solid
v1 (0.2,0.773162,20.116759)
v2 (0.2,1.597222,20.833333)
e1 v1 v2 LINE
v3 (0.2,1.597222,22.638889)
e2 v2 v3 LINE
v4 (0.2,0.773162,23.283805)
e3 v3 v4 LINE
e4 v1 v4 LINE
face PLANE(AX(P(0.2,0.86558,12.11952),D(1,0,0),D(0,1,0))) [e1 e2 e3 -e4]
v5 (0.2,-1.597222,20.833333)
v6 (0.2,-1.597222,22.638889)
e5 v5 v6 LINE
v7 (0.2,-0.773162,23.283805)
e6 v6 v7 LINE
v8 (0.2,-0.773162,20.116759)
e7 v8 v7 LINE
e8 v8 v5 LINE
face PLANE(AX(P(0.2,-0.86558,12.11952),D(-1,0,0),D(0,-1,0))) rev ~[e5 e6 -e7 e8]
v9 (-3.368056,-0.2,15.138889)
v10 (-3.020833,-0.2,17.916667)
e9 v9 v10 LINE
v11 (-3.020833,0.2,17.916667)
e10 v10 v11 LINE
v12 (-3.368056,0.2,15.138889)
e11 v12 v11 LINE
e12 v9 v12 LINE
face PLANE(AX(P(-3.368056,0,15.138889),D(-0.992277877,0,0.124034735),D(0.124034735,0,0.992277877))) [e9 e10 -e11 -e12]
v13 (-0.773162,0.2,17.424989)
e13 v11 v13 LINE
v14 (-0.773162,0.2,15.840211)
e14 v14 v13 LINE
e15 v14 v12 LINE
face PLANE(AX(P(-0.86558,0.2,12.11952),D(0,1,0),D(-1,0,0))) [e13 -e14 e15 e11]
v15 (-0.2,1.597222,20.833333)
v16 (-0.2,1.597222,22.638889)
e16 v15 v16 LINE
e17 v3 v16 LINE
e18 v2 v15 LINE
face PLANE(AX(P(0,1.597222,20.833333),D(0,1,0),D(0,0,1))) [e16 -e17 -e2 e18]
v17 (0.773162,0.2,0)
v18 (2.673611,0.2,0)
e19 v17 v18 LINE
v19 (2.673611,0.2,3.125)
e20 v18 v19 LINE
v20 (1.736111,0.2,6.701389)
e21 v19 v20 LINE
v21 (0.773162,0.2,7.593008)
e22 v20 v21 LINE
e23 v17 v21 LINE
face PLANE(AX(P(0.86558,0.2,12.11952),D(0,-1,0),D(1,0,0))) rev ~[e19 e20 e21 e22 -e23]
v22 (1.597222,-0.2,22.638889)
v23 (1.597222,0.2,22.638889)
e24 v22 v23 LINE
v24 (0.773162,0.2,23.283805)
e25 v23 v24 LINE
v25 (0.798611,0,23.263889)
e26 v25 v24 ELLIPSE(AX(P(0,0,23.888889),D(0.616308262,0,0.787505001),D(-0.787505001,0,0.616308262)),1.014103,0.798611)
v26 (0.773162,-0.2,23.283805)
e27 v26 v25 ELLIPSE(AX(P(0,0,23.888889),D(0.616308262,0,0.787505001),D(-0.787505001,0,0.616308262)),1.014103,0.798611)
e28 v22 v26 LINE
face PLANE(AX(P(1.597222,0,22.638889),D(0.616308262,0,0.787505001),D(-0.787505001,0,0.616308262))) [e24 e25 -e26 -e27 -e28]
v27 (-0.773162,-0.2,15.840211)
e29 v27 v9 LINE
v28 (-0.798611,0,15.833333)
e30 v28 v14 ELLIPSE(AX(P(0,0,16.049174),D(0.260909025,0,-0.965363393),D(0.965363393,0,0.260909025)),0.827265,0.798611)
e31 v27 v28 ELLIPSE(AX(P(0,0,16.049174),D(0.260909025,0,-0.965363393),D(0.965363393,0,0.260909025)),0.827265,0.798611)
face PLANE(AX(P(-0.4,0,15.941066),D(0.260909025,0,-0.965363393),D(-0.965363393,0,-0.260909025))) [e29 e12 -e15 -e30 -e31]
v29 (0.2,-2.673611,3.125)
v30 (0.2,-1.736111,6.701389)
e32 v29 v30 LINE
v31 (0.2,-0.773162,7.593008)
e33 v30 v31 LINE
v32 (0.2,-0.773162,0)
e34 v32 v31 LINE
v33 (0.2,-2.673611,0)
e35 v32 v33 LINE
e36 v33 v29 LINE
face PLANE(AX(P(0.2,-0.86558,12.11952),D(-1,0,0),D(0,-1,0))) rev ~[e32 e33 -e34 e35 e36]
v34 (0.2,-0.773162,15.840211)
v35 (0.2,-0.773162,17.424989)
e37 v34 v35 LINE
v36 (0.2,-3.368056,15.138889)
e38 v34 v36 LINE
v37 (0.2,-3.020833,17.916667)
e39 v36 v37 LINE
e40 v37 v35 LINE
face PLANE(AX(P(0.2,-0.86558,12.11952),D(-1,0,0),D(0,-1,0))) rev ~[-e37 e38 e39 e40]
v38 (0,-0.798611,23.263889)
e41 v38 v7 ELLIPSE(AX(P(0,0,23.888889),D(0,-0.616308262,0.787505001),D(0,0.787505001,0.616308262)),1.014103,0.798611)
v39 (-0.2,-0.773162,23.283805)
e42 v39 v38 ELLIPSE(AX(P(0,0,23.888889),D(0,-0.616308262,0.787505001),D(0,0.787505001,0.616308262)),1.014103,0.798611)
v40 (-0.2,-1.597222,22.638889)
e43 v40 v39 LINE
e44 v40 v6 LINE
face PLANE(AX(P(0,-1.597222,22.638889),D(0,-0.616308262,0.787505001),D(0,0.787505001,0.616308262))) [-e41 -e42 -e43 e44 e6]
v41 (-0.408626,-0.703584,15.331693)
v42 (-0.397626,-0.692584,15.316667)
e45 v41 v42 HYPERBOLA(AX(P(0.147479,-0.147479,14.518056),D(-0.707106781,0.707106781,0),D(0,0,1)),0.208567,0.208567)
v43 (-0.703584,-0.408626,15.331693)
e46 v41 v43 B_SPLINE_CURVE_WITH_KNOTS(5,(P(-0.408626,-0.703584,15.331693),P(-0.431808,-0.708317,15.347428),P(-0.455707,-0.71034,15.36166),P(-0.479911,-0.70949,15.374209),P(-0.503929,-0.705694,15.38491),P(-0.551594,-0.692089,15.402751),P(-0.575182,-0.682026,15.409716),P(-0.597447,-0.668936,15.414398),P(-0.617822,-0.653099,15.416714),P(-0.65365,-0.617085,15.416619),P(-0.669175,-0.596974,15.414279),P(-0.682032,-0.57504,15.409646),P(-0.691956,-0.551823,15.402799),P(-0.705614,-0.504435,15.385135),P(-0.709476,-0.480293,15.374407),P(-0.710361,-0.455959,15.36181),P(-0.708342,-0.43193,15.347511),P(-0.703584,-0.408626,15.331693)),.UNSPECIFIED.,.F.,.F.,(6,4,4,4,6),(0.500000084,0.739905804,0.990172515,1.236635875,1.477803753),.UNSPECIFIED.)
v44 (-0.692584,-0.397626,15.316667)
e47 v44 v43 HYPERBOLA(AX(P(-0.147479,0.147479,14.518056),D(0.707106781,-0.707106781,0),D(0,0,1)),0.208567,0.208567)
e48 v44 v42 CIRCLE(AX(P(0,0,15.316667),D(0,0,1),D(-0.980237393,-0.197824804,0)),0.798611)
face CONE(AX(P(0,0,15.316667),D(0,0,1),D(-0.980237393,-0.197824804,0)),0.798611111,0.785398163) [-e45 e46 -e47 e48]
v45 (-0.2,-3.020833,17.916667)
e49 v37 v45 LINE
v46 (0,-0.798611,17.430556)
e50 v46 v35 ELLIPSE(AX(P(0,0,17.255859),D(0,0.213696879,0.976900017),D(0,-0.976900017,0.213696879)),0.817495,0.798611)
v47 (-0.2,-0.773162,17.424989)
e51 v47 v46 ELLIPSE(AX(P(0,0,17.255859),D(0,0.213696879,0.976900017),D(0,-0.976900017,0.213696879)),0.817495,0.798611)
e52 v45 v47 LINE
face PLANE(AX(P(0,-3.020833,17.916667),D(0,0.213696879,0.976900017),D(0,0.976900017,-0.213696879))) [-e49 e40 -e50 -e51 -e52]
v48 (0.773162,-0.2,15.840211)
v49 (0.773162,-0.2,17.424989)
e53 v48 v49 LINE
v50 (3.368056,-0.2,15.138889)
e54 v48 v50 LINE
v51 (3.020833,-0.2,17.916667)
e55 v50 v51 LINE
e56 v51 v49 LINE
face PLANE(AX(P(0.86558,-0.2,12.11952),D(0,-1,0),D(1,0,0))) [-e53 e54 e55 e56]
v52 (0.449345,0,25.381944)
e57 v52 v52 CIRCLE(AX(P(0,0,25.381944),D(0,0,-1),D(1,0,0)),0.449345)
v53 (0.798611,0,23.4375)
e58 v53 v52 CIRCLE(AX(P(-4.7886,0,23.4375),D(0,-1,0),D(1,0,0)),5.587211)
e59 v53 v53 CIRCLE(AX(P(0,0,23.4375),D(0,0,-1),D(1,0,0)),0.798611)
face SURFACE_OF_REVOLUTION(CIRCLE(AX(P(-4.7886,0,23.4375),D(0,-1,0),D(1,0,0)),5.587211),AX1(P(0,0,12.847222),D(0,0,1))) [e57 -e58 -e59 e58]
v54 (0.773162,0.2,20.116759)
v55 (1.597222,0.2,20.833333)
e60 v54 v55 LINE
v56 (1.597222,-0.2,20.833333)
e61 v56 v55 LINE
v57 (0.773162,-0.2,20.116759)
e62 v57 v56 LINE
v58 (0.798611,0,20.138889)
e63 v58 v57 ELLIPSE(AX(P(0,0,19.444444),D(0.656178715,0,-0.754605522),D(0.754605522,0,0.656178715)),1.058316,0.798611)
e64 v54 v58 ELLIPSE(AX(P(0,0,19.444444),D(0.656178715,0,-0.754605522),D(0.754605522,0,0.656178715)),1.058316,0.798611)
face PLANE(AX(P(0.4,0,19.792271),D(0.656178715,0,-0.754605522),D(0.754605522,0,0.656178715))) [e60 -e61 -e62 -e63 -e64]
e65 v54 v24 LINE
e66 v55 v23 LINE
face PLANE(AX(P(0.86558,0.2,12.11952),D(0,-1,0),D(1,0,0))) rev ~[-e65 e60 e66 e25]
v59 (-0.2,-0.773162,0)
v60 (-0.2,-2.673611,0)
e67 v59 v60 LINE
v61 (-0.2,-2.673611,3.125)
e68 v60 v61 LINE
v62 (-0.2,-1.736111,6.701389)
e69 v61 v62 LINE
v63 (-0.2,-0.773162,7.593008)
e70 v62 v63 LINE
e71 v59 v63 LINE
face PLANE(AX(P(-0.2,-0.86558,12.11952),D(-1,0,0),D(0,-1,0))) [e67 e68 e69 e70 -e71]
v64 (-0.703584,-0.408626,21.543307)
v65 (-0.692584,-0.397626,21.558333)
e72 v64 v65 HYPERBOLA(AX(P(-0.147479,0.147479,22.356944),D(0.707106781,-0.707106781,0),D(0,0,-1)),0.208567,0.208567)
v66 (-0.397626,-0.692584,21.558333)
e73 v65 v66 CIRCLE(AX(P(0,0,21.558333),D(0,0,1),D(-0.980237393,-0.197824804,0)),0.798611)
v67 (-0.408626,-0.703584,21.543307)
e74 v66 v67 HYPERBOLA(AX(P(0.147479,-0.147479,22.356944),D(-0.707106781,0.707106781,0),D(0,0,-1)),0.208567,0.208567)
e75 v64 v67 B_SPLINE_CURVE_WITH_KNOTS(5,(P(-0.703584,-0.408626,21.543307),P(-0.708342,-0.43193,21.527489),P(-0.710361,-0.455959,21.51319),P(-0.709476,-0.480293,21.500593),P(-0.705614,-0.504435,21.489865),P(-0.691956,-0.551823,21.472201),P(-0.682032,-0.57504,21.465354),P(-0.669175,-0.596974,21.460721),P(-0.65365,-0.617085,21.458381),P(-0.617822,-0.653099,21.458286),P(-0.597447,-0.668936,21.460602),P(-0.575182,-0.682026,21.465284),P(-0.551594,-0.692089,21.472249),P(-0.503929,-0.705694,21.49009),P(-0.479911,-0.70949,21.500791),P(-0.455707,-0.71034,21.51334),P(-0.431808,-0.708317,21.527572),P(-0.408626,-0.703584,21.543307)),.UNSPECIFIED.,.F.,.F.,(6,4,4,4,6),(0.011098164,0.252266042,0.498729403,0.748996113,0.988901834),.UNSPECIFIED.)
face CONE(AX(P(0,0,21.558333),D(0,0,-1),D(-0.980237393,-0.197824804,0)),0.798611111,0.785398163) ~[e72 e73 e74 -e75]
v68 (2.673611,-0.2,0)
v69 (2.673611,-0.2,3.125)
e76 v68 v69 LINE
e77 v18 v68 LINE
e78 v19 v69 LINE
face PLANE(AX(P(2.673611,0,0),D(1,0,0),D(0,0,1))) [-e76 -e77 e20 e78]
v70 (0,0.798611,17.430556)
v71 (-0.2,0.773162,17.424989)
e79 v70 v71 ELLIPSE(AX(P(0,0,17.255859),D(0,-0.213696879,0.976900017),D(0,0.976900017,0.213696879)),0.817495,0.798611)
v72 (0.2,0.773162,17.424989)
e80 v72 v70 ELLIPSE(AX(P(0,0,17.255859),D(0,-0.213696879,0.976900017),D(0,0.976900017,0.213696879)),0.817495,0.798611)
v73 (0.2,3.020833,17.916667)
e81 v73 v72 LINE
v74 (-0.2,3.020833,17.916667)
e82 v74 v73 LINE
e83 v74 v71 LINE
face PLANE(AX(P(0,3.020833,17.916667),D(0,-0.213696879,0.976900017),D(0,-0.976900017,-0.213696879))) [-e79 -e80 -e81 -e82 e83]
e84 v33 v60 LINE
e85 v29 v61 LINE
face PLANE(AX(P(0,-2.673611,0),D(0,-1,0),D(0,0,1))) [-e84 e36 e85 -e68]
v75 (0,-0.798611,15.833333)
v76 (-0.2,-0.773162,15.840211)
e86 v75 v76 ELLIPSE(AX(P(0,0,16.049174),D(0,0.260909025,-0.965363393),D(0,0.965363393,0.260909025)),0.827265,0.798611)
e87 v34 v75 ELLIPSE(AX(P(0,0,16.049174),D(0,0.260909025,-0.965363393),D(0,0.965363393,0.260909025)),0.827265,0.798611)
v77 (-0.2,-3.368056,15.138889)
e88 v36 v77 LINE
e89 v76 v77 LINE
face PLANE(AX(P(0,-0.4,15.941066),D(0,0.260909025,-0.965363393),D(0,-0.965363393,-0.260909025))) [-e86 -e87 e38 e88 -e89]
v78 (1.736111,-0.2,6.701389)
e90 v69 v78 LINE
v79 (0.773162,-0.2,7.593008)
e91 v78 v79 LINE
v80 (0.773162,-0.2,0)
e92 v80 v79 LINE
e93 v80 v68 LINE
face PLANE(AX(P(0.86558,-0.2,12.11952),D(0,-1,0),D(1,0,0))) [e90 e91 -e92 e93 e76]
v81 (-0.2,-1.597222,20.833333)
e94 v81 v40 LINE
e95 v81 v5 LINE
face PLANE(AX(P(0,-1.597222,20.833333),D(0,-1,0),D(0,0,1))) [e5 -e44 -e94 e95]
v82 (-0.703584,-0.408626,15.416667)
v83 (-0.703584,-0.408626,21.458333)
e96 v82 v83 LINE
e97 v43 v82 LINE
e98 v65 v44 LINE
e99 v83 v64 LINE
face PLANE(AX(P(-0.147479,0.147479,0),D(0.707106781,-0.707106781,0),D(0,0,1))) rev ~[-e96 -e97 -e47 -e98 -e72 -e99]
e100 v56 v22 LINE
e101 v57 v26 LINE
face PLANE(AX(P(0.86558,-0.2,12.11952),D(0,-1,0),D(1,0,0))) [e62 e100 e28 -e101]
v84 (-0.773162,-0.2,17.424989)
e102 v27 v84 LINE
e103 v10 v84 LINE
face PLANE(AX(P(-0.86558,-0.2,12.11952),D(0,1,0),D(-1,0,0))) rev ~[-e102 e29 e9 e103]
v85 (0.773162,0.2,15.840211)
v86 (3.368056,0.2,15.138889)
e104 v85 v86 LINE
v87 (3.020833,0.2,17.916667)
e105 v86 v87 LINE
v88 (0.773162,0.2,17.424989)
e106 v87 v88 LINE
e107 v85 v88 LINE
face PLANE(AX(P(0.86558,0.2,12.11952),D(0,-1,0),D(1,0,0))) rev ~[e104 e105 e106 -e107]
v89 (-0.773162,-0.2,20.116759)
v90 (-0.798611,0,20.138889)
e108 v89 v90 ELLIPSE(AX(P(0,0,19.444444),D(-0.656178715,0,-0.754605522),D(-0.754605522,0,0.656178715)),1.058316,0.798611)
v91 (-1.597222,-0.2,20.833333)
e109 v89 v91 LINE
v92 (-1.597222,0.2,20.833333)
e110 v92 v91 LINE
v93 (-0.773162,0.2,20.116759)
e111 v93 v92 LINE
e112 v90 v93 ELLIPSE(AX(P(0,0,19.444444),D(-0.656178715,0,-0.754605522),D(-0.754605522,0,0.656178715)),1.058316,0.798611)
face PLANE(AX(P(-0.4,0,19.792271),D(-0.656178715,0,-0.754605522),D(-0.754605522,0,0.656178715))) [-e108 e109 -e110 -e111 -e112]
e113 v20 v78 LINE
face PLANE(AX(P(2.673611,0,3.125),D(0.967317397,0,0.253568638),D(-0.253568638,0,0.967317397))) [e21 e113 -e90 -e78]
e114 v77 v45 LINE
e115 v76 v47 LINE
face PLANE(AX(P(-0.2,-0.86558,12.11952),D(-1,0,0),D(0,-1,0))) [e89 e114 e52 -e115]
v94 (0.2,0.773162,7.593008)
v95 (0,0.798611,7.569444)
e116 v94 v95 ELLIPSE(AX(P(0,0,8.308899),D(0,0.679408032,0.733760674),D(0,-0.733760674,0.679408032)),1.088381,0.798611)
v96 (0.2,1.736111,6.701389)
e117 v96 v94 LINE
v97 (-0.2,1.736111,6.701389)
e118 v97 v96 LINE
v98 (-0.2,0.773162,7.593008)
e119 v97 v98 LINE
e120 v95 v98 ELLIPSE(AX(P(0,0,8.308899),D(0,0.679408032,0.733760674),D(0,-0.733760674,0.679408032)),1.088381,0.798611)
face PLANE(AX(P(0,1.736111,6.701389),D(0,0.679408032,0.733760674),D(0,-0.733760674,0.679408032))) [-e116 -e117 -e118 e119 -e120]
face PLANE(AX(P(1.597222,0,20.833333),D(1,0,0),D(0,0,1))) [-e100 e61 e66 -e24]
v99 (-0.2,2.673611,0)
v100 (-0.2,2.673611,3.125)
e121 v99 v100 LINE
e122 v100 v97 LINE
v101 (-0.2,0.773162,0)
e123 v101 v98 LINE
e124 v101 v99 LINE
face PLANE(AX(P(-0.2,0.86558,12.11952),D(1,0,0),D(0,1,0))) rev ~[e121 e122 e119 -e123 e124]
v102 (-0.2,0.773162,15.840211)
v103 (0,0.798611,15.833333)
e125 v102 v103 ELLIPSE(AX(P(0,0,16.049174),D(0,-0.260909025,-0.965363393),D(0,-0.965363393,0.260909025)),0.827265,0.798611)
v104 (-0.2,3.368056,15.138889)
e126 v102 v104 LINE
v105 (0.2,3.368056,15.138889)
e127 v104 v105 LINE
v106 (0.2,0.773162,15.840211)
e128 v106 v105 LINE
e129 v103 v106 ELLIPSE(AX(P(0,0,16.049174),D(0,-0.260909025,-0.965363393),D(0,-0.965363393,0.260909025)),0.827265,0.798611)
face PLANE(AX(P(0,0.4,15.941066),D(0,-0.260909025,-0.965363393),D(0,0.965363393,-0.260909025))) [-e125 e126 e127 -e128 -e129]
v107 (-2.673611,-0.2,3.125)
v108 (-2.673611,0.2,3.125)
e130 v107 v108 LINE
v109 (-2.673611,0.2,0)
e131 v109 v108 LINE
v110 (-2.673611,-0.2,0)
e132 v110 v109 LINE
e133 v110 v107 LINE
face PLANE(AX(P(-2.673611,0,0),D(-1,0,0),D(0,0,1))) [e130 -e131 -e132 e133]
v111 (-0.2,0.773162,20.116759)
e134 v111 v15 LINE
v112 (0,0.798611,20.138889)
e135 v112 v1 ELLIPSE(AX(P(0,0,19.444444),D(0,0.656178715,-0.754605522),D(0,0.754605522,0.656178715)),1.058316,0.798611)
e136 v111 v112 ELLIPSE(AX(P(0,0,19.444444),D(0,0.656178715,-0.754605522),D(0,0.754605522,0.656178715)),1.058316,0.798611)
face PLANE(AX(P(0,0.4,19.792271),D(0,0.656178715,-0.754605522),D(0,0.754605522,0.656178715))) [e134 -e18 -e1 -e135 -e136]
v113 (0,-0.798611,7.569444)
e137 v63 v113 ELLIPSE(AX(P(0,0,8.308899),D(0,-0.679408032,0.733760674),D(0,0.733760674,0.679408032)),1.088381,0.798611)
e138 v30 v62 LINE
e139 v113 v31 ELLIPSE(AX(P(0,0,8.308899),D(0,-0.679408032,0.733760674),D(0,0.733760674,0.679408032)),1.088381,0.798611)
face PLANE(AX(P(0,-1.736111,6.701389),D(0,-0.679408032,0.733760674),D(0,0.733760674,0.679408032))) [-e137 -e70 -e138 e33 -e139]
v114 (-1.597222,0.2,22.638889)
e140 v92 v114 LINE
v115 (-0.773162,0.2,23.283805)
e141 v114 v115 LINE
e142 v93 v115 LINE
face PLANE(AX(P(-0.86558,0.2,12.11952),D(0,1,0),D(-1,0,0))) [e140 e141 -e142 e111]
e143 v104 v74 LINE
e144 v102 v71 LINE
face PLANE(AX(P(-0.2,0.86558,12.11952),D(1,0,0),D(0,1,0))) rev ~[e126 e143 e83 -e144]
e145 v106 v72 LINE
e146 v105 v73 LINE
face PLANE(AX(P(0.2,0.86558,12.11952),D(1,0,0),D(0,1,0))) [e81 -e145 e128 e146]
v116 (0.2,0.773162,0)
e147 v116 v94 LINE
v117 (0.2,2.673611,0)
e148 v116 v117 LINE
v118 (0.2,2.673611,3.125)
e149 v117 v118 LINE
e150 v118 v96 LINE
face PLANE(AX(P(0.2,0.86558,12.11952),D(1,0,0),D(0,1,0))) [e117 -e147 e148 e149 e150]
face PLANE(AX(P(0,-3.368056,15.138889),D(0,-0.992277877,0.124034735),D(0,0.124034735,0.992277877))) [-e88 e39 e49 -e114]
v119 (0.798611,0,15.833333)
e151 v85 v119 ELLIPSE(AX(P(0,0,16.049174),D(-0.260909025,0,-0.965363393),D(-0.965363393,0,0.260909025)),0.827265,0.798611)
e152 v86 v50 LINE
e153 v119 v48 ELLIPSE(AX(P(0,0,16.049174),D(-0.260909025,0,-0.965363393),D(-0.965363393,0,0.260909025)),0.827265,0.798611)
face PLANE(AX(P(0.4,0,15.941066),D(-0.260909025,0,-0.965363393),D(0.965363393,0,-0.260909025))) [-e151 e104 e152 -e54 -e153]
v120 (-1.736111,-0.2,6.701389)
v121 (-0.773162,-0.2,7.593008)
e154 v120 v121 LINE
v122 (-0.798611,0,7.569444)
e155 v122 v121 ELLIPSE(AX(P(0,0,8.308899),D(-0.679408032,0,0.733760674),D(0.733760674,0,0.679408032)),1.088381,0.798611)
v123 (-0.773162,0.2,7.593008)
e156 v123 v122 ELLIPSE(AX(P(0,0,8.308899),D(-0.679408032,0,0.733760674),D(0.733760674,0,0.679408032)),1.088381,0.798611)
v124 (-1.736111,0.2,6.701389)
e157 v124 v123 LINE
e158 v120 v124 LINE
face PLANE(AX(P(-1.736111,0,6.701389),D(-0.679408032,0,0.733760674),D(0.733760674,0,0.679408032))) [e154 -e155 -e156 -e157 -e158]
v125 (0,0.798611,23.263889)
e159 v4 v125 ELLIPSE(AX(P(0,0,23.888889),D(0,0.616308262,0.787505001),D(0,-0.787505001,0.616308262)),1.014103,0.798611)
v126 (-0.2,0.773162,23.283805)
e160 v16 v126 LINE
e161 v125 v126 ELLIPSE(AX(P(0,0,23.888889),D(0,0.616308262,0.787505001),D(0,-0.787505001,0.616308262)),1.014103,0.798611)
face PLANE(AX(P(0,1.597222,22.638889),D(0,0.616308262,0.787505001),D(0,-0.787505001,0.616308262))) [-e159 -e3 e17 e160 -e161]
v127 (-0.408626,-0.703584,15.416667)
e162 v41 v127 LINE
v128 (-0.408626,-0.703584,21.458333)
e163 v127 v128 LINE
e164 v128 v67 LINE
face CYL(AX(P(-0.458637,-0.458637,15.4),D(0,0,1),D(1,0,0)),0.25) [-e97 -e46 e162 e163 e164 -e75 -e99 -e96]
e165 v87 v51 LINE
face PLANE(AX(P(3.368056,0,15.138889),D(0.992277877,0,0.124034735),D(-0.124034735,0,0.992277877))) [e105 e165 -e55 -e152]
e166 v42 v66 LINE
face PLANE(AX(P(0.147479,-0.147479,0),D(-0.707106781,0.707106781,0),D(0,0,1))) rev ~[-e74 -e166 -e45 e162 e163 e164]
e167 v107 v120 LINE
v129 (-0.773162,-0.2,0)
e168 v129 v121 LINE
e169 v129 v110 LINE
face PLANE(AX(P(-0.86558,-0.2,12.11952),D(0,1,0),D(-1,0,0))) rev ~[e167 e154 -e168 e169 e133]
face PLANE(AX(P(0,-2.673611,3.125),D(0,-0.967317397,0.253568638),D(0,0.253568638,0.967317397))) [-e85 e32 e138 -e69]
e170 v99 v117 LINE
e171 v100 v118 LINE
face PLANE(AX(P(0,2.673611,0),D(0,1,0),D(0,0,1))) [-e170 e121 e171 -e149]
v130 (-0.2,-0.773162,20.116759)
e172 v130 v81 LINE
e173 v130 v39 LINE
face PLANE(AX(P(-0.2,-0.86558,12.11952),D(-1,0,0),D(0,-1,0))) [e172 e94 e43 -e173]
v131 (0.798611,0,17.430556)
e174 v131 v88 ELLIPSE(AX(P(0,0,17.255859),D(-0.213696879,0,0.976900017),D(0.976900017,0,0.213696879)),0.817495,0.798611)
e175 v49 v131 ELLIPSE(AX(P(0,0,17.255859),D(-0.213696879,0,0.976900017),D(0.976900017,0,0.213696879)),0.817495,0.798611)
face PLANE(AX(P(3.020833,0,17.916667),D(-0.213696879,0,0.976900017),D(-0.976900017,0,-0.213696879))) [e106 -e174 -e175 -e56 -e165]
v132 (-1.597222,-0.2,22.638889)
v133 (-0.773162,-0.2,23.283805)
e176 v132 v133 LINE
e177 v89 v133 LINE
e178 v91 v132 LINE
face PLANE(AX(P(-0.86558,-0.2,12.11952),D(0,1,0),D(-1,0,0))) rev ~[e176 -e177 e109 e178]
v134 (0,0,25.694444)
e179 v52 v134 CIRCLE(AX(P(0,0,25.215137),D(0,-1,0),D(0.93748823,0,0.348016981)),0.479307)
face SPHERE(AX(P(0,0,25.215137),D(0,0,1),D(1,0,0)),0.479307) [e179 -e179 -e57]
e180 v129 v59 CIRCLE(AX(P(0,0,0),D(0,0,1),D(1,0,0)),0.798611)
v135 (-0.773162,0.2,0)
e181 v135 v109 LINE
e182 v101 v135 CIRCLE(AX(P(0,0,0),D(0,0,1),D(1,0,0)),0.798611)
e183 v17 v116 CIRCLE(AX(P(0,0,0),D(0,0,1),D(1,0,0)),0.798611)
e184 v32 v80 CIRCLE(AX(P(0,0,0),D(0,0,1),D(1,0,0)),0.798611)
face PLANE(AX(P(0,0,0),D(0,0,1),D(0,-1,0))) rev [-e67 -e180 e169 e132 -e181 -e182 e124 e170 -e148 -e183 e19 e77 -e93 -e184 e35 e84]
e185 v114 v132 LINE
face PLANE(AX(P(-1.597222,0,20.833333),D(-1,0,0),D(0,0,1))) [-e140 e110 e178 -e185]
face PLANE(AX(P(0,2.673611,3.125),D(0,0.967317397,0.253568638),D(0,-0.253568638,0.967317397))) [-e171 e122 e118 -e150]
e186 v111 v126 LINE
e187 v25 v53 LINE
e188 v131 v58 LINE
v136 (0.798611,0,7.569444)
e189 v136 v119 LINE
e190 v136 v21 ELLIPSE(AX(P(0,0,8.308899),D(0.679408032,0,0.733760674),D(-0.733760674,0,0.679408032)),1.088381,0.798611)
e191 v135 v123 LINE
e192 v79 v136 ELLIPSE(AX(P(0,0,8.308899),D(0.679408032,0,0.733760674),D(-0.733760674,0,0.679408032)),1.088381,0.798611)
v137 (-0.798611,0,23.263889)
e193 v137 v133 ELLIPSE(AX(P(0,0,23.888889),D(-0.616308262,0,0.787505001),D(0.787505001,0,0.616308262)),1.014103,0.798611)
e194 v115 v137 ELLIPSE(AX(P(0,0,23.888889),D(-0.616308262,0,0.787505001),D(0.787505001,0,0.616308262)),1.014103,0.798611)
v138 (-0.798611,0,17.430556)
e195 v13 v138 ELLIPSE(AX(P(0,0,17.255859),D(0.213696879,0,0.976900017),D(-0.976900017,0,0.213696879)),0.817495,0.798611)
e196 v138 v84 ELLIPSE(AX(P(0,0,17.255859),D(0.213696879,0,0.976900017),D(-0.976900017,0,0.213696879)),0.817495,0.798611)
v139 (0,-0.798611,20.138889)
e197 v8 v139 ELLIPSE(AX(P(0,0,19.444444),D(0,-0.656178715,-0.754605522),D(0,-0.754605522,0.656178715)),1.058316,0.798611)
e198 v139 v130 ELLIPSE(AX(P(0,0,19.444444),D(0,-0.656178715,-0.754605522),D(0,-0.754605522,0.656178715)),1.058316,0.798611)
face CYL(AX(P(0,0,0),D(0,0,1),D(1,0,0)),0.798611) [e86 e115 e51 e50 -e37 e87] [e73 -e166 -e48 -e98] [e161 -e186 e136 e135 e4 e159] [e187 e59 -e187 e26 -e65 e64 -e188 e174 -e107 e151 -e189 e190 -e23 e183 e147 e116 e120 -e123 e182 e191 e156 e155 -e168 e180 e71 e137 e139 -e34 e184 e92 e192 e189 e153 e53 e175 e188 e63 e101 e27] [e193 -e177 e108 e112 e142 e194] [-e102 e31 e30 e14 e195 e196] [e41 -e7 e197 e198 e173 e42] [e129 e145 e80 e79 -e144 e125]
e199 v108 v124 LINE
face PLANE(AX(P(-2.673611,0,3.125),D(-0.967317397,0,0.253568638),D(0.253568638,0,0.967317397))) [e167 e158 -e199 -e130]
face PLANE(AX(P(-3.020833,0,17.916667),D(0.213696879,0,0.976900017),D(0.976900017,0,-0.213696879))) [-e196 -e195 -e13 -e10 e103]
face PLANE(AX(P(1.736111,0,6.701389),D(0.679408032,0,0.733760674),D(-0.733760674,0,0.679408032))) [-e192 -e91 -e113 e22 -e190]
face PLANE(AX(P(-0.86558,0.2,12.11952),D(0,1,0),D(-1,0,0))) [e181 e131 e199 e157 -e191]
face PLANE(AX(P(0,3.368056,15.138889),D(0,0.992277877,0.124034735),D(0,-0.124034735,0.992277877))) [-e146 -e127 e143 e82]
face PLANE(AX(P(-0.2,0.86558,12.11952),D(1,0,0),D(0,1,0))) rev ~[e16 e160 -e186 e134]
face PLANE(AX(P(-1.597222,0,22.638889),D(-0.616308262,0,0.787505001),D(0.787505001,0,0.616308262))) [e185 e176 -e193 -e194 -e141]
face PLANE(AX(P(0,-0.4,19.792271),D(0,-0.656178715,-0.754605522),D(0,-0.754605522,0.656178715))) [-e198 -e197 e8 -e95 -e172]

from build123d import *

# Parameters (mm, degrees)
F4_DEPTH     = 0.2
F5_COUNT     = 4
F8_DEPTH     = 6.0416666667
F9_T4_ANGLE  = 67.1804235359
F9_S7_R      = 0.25
F9_T8_DEPTH  = 2
F9_T12_ANGLE = 67.1804235359
F9_S15_R     = 0.25
F9_T16_DEPTH = 2


# Not quite as in the source:
# - a fillet or chamfer that OpenCascade refuses, or shapes differently, is made with other operations: its cross-section is extruded or revolved along the edge and cut away or added


with BuildPart() as f2:
    # F1 (on Front) → F2 (revolve)
    with BuildSketch(Plane.XZ):
        with BuildLine():
            Line((0, 25.6944444444), (0, 0))
            Line((0, 0), (0.7986111111, 0))
            Line((0.7986111111, 0), (0.7986111111, 23.4375))
            ThreePointArc((0.7986111111, 23.4375), (0.7106013269, 24.425281766), (0.4493446353, 25.3819444444))
            ThreePointArc((0.4493446353, 25.3819444444), (0.2736635029, 25.6086390085), (0, 25.6944444444))
        make_face()
    revolve(axis=Axis((0, 0, 12.8472222222), (0, 0, 1)))

    # F3 (on Front) → F4 (join, symmetric)
    with BuildSketch(Plane.XZ):
        Polygon((0, 23.8888888889), (0, 0), (0.7986111111, 0), (2.6736111111, 0), (2.6736111111, 3.125), (1.7361111111, 6.7013888889), (0.4, 7.9385288066), (0.4, 15.9410660661), (3.3680555556, 15.1388888889), (3.0208333333, 17.9166666667), (0.4, 17.343359375), (0.4, 19.7922705314), (1.5972222222, 20.8333333333), (1.5972222222, 22.6388888889), align=None)
    extrude(amount=F4_DEPTH, both=True)

    # F5: F2 ×4 about axis
    f5_axis = Axis((0, 0, 0), (0, 0, 1))


with BuildPart() as f2_1:
    add(f2.part)
    for i in range(1, F5_COUNT):
        add(f2.part.rotate(f5_axis, i * 360 / F5_COUNT))

    # F7 (on offset) → F8 (join)
    with BuildSketch(Plane.XY.offset(15.4166666667)):
        with BuildLine():
            Line((-0.4086259328, -0.7035839656), (-0.1424359704, -0.4373940032))
            Line((-0.1424359704, -0.4373940032), (-0.4373940032, -0.1424359704))
            Line((-0.4373940032, -0.1424359704), (-0.7035839656, -0.4086259328))
            ThreePointArc((-0.7035839656, -0.4086259328), (-0.6354140103, -0.6354140103), (-0.4086259328, -0.7035839656))
        make_face()
    extrude(amount=F8_DEPTH)

    # F9: chamfer of 0.1 on 2 edges, made by hand


with BuildPart() as f9_tool2:
    # F9_s3 → F9_t4 (revolve)
    with BuildSketch(Plane(origin=(0, 0, 0), x_dir=(0, 0, 1), z_dir=(-0.197824804, 0.9802373932, 0))):
        Polygon((21.5583333333, -0.7986111111), (21.4583333333, -0.8986111111), (21.4583333333, -0.7986111111), align=None)
    revolve(axis=Axis((0, 0, 21.4583333333), (0, 0, 1)), revolution_arc=F9_T4_ANGLE)

    split(bisect_by=Plane(origin=(0.1474790164, -0.1474790164, 0), x_dir=(0, 0, 1), z_dir=(-0.7071067812, 0.7071067812, 0)), keep=Keep.TOP)

    split(bisect_by=Plane(origin=(-0.1474790164, 0.1474790164, 0), x_dir=(0, 0, 1), z_dir=(0.7071067812, -0.7071067812, 0)), keep=Keep.TOP)

    # F9_s7 → F9_t8 (intersect, symmetric)
    with BuildSketch(Plane.XY.offset(21.5)):
        with Locations((-0.458637315, -0.458637315)):
            Circle(F9_S7_R)
    extrude(amount=F9_T8_DEPTH, both=True, mode=Mode.INTERSECT)


with BuildPart() as f2_2:
    add(f2_1.part)

    # F9_t1: union F9_tool2
    add(f9_tool2.part)


with BuildPart() as f9_tool10:
    # F9_s11 → F9_t12 (revolve)
    with BuildSketch(Plane(origin=(0, 0, 0), x_dir=(0, 0, 1), z_dir=(-0.197824804, 0.9802373932, 0))):
        Polygon((15.3166666667, -0.7986111111), (15.4166666667, -0.8986111111), (15.4166666667, -0.7986111111), align=None)
    revolve(axis=Axis((0, 0, 15.4166666667), (0, 0, 1)), revolution_arc=F9_T12_ANGLE)

    split(bisect_by=Plane(origin=(0.1474790164, -0.1474790164, 0), x_dir=(0, 0, 1), z_dir=(-0.7071067812, 0.7071067812, 0)), keep=Keep.TOP)

    split(bisect_by=Plane(origin=(-0.1474790164, 0.1474790164, 0), x_dir=(0, 0, 1), z_dir=(0.7071067812, -0.7071067812, 0)), keep=Keep.TOP)

    # F9_s15 → F9_t16 (intersect, symmetric)
    with BuildSketch(Plane.XY.offset(15.4)):
        with Locations((-0.458637315, -0.458637315)):
            Circle(F9_S15_R)
    extrude(amount=F9_T16_DEPTH, both=True, mode=Mode.INTERSECT)


with BuildPart() as f2_3:
    add(f2_2.part)

    # F9_t9: union F9_tool10
    add(f9_tool10.part)


solid = f2_3.part
